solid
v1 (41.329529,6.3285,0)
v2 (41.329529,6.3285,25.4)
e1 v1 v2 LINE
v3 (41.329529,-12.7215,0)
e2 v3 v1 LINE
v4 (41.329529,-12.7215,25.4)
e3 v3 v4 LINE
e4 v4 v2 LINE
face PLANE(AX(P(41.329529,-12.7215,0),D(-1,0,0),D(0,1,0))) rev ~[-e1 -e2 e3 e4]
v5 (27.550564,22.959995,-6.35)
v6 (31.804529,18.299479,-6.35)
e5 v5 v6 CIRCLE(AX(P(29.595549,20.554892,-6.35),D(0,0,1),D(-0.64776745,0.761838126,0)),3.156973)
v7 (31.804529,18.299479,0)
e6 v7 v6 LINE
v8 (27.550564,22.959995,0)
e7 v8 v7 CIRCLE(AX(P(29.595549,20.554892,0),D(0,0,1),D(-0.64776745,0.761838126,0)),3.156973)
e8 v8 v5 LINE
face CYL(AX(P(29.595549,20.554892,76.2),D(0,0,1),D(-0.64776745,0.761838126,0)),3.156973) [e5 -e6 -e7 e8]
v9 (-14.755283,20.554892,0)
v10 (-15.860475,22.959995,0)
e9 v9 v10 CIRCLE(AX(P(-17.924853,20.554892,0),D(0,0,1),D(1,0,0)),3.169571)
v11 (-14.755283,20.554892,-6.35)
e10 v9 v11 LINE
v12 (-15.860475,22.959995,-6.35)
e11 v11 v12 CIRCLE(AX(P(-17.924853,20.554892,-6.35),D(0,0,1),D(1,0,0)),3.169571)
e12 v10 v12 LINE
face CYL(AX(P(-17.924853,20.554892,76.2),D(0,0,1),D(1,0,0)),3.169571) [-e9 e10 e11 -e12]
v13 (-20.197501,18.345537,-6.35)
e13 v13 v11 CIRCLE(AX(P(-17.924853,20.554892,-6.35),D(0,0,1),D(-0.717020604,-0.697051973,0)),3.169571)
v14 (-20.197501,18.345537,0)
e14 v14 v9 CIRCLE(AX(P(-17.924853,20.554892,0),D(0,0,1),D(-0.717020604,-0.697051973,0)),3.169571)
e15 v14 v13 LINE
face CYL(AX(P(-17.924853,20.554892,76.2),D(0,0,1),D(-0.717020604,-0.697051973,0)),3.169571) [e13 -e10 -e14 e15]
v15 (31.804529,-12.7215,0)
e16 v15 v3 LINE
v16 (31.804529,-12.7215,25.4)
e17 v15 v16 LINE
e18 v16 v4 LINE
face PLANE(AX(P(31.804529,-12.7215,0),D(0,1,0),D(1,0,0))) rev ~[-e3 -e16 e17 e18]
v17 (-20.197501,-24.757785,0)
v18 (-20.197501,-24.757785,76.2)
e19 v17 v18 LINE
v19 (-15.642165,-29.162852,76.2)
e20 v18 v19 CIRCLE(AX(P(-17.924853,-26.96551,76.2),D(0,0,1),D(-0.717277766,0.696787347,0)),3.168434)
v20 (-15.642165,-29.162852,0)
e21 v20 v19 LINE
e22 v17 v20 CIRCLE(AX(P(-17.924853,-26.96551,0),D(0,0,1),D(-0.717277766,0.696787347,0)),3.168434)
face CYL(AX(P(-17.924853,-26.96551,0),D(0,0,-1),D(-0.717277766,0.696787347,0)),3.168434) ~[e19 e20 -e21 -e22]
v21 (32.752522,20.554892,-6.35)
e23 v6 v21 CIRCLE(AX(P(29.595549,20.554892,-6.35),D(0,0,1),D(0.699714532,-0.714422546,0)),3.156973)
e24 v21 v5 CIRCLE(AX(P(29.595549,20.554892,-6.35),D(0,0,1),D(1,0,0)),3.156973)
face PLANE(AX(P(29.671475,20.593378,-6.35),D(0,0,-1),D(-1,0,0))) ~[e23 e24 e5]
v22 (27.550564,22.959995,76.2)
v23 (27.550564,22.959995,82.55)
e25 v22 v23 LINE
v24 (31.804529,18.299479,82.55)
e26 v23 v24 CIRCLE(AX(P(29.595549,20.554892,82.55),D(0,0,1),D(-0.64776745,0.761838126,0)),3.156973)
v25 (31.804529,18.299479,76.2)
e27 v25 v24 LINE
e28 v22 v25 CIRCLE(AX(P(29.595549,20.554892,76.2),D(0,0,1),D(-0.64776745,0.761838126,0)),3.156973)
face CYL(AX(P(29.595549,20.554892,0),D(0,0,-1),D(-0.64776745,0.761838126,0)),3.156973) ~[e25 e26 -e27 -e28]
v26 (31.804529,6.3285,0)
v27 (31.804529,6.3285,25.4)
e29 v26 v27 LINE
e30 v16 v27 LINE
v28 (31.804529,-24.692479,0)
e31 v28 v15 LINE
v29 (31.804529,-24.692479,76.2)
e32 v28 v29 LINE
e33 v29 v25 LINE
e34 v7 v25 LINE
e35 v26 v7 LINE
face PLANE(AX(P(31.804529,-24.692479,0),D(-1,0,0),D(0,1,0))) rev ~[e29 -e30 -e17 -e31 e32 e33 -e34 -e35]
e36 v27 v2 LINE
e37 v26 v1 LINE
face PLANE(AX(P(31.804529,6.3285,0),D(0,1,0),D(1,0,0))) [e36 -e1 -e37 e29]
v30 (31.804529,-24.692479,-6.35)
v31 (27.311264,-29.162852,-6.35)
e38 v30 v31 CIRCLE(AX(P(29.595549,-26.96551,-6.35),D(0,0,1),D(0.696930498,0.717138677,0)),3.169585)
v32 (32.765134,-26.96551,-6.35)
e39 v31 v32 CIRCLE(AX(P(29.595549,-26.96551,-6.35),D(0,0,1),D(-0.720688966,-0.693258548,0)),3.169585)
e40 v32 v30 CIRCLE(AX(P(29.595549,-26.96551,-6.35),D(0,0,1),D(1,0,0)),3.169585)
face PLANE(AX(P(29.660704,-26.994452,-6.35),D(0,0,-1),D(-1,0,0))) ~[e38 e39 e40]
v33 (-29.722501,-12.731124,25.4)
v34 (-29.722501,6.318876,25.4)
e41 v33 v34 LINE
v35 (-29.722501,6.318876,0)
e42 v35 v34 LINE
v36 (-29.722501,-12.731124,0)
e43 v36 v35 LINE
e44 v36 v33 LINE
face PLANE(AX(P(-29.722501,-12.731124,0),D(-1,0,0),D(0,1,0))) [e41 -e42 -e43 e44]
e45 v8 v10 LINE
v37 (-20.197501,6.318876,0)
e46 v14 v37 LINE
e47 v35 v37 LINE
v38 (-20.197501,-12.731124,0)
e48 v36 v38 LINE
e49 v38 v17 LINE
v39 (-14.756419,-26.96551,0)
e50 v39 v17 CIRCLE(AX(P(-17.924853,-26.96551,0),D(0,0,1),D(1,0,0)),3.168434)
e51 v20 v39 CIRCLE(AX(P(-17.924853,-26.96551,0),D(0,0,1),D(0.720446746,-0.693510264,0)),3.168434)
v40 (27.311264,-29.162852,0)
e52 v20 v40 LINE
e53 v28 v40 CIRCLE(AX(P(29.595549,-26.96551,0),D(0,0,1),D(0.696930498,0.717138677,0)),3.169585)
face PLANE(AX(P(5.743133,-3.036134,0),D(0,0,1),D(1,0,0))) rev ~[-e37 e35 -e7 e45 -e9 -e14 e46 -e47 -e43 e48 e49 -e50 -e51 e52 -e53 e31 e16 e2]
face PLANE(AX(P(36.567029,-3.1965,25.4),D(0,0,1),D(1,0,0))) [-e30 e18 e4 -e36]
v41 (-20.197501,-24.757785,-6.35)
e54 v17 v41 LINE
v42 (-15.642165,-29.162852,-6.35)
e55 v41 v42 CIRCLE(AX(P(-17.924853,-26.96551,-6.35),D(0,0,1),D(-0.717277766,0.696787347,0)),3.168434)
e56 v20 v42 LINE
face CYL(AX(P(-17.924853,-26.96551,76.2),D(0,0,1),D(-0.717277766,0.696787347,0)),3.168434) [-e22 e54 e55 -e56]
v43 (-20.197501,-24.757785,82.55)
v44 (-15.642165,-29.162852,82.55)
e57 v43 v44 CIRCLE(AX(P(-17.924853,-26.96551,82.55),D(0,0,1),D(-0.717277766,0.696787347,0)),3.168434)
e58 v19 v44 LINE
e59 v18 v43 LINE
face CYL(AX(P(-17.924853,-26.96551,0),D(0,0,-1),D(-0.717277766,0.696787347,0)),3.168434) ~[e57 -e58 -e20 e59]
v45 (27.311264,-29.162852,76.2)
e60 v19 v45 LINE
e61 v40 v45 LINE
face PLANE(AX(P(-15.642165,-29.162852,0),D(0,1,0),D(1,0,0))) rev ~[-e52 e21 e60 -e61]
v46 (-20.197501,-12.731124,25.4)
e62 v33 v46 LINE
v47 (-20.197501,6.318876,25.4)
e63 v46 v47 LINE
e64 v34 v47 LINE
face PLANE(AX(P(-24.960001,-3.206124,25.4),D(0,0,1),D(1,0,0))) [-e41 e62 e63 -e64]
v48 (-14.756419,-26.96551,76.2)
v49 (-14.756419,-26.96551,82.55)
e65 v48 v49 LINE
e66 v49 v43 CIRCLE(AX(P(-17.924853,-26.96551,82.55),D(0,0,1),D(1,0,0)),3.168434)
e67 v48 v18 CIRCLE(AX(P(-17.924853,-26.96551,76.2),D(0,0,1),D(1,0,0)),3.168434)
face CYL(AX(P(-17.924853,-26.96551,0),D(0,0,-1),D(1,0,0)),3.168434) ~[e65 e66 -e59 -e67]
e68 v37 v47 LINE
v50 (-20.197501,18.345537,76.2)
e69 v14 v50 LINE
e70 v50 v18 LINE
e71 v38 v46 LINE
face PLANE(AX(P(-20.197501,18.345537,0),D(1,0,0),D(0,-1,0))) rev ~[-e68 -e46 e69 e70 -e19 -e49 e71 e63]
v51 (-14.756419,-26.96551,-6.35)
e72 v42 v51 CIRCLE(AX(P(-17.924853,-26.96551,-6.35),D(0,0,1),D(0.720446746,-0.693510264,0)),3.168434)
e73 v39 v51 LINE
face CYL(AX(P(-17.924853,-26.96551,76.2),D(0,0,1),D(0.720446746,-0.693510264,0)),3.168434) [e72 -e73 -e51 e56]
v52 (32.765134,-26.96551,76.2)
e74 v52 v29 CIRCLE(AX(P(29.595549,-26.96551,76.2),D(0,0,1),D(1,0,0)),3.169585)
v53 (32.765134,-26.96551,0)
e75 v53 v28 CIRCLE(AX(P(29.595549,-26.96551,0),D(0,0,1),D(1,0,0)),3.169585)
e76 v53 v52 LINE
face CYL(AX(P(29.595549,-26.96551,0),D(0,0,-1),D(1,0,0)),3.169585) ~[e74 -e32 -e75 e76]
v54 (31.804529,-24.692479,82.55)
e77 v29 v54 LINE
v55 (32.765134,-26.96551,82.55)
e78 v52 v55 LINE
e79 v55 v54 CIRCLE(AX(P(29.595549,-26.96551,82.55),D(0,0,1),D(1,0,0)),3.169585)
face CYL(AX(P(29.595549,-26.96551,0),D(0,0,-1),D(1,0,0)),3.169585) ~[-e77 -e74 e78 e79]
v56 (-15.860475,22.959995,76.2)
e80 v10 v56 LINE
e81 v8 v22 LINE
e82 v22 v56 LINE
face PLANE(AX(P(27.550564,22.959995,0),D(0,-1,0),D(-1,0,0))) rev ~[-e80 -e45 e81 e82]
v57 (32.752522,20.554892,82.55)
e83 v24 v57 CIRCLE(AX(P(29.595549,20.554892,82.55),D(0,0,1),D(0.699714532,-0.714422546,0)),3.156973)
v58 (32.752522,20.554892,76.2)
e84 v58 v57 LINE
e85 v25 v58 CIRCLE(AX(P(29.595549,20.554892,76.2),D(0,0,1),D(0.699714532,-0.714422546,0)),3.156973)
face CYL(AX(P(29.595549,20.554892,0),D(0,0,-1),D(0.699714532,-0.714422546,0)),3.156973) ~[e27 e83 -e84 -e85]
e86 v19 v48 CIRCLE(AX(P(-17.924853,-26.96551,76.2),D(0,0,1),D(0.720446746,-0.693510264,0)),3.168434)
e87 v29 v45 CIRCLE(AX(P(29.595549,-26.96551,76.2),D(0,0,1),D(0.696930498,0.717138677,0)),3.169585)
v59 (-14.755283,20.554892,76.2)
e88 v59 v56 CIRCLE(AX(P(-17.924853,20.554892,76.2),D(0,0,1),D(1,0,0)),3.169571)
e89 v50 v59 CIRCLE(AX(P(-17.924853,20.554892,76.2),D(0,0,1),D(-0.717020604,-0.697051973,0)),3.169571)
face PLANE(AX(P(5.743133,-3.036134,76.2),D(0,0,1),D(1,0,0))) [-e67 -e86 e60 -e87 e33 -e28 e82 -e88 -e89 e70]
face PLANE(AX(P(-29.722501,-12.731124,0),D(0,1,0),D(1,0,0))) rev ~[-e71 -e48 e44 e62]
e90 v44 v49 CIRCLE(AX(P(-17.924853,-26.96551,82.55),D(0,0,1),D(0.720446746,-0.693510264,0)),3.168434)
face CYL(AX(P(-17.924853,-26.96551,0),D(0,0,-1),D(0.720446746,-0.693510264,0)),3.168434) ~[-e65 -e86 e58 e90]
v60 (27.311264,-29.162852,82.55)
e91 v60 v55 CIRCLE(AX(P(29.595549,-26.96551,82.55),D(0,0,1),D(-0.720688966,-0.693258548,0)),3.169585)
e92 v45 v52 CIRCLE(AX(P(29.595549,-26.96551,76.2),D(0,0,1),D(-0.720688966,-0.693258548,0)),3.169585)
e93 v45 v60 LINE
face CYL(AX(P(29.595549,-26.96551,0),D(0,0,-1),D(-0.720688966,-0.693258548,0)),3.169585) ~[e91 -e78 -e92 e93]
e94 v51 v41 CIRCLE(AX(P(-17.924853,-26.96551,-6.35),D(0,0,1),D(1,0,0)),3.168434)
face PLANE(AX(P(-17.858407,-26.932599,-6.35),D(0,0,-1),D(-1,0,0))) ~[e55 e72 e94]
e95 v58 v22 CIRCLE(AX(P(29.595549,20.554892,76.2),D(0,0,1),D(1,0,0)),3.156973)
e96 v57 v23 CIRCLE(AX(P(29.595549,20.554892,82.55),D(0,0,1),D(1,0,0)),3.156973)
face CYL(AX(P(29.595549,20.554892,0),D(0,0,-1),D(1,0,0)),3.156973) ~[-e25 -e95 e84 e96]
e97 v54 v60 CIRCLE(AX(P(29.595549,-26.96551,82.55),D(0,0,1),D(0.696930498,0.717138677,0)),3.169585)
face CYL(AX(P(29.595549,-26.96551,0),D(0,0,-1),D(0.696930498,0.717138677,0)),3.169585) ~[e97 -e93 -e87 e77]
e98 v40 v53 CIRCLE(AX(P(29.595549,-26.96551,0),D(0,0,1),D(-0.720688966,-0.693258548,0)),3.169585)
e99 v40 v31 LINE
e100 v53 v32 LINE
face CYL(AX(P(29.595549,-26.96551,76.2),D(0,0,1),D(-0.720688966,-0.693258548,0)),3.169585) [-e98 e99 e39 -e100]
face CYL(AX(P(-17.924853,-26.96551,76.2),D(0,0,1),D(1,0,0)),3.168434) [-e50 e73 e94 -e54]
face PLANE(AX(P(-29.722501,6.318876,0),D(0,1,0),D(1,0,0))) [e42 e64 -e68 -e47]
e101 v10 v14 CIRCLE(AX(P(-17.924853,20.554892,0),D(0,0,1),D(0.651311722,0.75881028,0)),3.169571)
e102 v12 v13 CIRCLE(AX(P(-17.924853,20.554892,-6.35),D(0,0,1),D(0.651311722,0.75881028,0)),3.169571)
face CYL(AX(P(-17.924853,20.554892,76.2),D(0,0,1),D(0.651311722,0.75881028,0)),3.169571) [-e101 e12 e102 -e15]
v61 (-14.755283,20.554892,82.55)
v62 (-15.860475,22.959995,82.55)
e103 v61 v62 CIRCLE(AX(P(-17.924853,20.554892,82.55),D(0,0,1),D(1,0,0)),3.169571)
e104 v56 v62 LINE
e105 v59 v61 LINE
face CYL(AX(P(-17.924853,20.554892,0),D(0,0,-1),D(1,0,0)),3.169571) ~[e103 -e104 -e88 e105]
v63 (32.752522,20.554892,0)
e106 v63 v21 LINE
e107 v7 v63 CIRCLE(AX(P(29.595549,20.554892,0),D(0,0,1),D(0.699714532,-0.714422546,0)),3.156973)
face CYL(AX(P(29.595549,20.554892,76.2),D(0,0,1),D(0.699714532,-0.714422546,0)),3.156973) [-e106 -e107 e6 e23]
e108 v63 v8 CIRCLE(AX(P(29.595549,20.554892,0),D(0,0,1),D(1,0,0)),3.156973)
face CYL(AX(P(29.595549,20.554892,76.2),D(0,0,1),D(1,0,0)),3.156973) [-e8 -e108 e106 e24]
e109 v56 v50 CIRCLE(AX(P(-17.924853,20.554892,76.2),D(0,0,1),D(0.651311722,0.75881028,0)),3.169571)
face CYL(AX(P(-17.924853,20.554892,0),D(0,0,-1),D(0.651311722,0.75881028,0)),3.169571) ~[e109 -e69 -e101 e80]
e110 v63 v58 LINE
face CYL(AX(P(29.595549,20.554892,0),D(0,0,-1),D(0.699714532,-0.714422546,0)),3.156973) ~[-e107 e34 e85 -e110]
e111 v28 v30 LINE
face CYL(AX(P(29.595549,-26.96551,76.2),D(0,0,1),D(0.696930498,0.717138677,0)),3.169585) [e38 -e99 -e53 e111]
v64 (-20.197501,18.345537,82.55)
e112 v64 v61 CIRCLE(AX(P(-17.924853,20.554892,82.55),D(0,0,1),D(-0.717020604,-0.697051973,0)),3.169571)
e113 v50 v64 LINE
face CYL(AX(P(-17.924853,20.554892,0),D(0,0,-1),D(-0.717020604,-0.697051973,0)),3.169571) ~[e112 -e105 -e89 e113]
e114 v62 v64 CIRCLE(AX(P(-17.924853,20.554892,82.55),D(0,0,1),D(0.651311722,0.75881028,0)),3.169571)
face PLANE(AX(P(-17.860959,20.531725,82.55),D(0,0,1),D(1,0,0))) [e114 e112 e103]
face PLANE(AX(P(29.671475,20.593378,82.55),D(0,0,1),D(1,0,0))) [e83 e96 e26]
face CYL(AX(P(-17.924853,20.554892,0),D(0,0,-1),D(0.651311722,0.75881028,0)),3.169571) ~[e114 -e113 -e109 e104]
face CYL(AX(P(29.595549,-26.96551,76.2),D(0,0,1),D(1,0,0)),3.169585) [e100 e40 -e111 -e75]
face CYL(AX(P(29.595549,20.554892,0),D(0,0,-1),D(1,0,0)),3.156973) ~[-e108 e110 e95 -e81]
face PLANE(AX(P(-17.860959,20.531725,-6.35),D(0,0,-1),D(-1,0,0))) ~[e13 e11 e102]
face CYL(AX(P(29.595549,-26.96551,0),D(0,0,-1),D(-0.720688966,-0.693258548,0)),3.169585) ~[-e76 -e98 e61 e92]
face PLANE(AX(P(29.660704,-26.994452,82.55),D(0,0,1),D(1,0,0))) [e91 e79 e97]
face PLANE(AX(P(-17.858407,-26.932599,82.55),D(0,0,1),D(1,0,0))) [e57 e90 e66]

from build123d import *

# Parameters (mm, degrees)
F1_DEPTH = 82.55
F2_DEPTH = 76.2
F0_W     = 9.525
F0_H     = 19.05
F3_DEPTH = 25.4


# Not quite as in the source:
# - a feature of the source that left no trace in its solid (it failed there, or was rolled back) is left out
# - a pattern or mirror of a feature is missing from the dataset's text; its kind, count and spacing are read off the source's solid


with BuildPart() as f1:
    # F0 (on Top) → F1 (new body)
    with BuildSketch(Plane.XY):
        with BuildLine():
            ThreePointArc((-20.197500676, 18.3455366127), (-16.7326156752, 17.6181000932), (-14.7552827986, 20.5548919915))
            ThreePointArc((-14.7552827986, 20.5548919915), (-15.044803813, 21.8783314962), (-15.8604748841, 22.9599946804))
            ThreePointArc((-15.8604748841, 22.9599946804), (-20.234431152, 22.7256124785), (-20.197500676, 18.3455366127))
        make_face()
    extrude(amount=F1_DEPTH)

    # F1_copies: F1 across plane


with BuildPart() as f1b:
    # F0 (on Top) → F1, piece 2 (new body)
    with BuildSketch(Plane.XY):
        with BuildLine():
            ThreePointArc((32.7525223778, 20.5548919915), (30.9204110591, 23.4204148874), (27.5505643884, 22.9599946804))
            ThreePointArc((27.5505643884, 22.9599946804), (27.2638489298, 18.4265931888), (31.8045291463, 18.2994790273))
            ThreePointArc((31.8045291463, 18.2994790273), (32.5058902534, 19.3316198625), (32.7525223778, 20.5548919915))
        make_face()
    extrude(amount=F1_DEPTH)

    # F1_2_copies: F1b across plane


with BuildPart() as f1c:
    # F0 (on Top) → F1, piece 3 (new body)
    with BuildSketch(Plane.XY):
        with BuildLine():
            ThreePointArc((32.7651335661, -26.9655103104), (32.5151222308, -25.7316713922), (31.8045291463, -24.6924786227))
            ThreePointArc((31.8045291463, -24.6924786227), (27.3600452383, -24.7185591863), (27.3112643614, -29.1628519118))
            ThreePointArc((27.3112643614, -29.1628519118), (30.7800389767, -29.9054507611), (32.7651335661, -26.9655103104))
        make_face()
    extrude(amount=F1_DEPTH)

    # F1_3_copies: F1c across plane


with BuildPart() as f1d:
    # F0 (on Top) → F1, piece 4 (new body)
    with BuildSketch(Plane.XY):
        with BuildLine():
            ThreePointArc((-14.7564191649, -26.9655103104), (-16.7335847801, -24.0295514846), (-20.197500676, -24.7577854871))
            ThreePointArc((-20.197500676, -24.7577854871), (-20.1273922452, -29.2431839447), (-15.6421652409, -29.1628519118))
            ThreePointArc((-15.6421652409, -29.1628519118), (-14.9861867967, -28.150083675), (-14.7564191649, -26.9655103104))
        make_face()
    extrude(amount=F1_DEPTH)

    # F1_4_copies: F1d across plane


with BuildPart() as f1_1:
    add(f1.part)
    add(f1.part.mirror(Plane(origin=(0, 0, 38.1), x_dir=(-1, 0, 0), z_dir=(0, 0, -1))))



with BuildPart() as f1b_1:
    add(f1b.part)
    add(f1b.part.mirror(Plane(origin=(0, 0, 38.1), x_dir=(-1, 0, 0), z_dir=(0, 0, -1))))


with BuildPart() as f1c_1:
    add(f1c.part)
    add(f1c.part.mirror(Plane(origin=(0, 0, 38.1), x_dir=(-1, 0, 0), z_dir=(0, 0, -1))))


with BuildPart() as f1d_1:
    add(f1d.part)
    add(f1d.part.mirror(Plane(origin=(0, 0, 38.1), x_dir=(-1, 0, 0), z_dir=(0, 0, -1))))


with BuildPart() as f1_2:
    add(f1_1.part)

    add(f1b_1.part)  # F2 merges F1b

    add(f1c_1.part)  # F2 merges F1c

    add(f1d_1.part)  # F2 merges F1d
    # F0 (on Top) → F2 (join)
    with BuildSketch(Plane.XY):
        with BuildLine():
            ThreePointArc((-15.8604748841, 22.9599946804), (-15.044803813, 21.8783314962), (-14.7552827986, 20.5548919915))
            ThreePointArc((-14.7552827986, 20.5548919915), (-16.7326156752, 17.6181000932), (-20.197500676, 18.3455366127))
            Line((-20.197500676, 18.3455366127), (-20.197500676, 6.3188755628))
            Line((-20.197500676, 6.3188755628), (-20.197500676, -12.7311244372))
            Line((-20.197500676, -12.7311244372), (-20.197500676, -24.7577854871))
            ThreePointArc((-20.197500676, -24.7577854871), (-16.7335847801, -24.0295514846), (-14.7564191649, -26.9655103104))
            ThreePointArc((-14.7564191649, -26.9655103104), (-14.9861867967, -28.150083675), (-15.6421652409, -29.1628519118))
            Line((-15.6421652409, -29.1628519118), (27.3112643614, -29.1628519118))
            ThreePointArc((27.3112643614, -29.1628519118), (27.3600452383, -24.7185591863), (31.8045291463, -24.6924786227))
            Line((31.8045291463, -24.6924786227), (31.8045291463, -12.7214997977))
            Line((31.8045291463, -12.7214997977), (31.8045291463, 6.3285002023))
            Line((31.8045291463, 6.3285002023), (31.8045291463, 18.2994790273))
            ThreePointArc((31.8045291463, 18.2994790273), (27.2638489298, 18.4265931888), (27.5505643884, 22.9599946804))
            Line((27.5505643884, 22.9599946804), (-15.8604748841, 22.9599946804))
        make_face()
    extrude(amount=F2_DEPTH)

    # F0 (on Top) → F3 (join)
    with BuildSketch(Plane.XY):
        with Locations((-24.960000676, -3.2061244372)):
            Rectangle(F0_W, F0_H)
        with Locations((36.5670291463, -3.1964997977)):
            Rectangle(F0_W, F0_H)
    extrude(amount=F3_DEPTH)


solid = f1_2.part
